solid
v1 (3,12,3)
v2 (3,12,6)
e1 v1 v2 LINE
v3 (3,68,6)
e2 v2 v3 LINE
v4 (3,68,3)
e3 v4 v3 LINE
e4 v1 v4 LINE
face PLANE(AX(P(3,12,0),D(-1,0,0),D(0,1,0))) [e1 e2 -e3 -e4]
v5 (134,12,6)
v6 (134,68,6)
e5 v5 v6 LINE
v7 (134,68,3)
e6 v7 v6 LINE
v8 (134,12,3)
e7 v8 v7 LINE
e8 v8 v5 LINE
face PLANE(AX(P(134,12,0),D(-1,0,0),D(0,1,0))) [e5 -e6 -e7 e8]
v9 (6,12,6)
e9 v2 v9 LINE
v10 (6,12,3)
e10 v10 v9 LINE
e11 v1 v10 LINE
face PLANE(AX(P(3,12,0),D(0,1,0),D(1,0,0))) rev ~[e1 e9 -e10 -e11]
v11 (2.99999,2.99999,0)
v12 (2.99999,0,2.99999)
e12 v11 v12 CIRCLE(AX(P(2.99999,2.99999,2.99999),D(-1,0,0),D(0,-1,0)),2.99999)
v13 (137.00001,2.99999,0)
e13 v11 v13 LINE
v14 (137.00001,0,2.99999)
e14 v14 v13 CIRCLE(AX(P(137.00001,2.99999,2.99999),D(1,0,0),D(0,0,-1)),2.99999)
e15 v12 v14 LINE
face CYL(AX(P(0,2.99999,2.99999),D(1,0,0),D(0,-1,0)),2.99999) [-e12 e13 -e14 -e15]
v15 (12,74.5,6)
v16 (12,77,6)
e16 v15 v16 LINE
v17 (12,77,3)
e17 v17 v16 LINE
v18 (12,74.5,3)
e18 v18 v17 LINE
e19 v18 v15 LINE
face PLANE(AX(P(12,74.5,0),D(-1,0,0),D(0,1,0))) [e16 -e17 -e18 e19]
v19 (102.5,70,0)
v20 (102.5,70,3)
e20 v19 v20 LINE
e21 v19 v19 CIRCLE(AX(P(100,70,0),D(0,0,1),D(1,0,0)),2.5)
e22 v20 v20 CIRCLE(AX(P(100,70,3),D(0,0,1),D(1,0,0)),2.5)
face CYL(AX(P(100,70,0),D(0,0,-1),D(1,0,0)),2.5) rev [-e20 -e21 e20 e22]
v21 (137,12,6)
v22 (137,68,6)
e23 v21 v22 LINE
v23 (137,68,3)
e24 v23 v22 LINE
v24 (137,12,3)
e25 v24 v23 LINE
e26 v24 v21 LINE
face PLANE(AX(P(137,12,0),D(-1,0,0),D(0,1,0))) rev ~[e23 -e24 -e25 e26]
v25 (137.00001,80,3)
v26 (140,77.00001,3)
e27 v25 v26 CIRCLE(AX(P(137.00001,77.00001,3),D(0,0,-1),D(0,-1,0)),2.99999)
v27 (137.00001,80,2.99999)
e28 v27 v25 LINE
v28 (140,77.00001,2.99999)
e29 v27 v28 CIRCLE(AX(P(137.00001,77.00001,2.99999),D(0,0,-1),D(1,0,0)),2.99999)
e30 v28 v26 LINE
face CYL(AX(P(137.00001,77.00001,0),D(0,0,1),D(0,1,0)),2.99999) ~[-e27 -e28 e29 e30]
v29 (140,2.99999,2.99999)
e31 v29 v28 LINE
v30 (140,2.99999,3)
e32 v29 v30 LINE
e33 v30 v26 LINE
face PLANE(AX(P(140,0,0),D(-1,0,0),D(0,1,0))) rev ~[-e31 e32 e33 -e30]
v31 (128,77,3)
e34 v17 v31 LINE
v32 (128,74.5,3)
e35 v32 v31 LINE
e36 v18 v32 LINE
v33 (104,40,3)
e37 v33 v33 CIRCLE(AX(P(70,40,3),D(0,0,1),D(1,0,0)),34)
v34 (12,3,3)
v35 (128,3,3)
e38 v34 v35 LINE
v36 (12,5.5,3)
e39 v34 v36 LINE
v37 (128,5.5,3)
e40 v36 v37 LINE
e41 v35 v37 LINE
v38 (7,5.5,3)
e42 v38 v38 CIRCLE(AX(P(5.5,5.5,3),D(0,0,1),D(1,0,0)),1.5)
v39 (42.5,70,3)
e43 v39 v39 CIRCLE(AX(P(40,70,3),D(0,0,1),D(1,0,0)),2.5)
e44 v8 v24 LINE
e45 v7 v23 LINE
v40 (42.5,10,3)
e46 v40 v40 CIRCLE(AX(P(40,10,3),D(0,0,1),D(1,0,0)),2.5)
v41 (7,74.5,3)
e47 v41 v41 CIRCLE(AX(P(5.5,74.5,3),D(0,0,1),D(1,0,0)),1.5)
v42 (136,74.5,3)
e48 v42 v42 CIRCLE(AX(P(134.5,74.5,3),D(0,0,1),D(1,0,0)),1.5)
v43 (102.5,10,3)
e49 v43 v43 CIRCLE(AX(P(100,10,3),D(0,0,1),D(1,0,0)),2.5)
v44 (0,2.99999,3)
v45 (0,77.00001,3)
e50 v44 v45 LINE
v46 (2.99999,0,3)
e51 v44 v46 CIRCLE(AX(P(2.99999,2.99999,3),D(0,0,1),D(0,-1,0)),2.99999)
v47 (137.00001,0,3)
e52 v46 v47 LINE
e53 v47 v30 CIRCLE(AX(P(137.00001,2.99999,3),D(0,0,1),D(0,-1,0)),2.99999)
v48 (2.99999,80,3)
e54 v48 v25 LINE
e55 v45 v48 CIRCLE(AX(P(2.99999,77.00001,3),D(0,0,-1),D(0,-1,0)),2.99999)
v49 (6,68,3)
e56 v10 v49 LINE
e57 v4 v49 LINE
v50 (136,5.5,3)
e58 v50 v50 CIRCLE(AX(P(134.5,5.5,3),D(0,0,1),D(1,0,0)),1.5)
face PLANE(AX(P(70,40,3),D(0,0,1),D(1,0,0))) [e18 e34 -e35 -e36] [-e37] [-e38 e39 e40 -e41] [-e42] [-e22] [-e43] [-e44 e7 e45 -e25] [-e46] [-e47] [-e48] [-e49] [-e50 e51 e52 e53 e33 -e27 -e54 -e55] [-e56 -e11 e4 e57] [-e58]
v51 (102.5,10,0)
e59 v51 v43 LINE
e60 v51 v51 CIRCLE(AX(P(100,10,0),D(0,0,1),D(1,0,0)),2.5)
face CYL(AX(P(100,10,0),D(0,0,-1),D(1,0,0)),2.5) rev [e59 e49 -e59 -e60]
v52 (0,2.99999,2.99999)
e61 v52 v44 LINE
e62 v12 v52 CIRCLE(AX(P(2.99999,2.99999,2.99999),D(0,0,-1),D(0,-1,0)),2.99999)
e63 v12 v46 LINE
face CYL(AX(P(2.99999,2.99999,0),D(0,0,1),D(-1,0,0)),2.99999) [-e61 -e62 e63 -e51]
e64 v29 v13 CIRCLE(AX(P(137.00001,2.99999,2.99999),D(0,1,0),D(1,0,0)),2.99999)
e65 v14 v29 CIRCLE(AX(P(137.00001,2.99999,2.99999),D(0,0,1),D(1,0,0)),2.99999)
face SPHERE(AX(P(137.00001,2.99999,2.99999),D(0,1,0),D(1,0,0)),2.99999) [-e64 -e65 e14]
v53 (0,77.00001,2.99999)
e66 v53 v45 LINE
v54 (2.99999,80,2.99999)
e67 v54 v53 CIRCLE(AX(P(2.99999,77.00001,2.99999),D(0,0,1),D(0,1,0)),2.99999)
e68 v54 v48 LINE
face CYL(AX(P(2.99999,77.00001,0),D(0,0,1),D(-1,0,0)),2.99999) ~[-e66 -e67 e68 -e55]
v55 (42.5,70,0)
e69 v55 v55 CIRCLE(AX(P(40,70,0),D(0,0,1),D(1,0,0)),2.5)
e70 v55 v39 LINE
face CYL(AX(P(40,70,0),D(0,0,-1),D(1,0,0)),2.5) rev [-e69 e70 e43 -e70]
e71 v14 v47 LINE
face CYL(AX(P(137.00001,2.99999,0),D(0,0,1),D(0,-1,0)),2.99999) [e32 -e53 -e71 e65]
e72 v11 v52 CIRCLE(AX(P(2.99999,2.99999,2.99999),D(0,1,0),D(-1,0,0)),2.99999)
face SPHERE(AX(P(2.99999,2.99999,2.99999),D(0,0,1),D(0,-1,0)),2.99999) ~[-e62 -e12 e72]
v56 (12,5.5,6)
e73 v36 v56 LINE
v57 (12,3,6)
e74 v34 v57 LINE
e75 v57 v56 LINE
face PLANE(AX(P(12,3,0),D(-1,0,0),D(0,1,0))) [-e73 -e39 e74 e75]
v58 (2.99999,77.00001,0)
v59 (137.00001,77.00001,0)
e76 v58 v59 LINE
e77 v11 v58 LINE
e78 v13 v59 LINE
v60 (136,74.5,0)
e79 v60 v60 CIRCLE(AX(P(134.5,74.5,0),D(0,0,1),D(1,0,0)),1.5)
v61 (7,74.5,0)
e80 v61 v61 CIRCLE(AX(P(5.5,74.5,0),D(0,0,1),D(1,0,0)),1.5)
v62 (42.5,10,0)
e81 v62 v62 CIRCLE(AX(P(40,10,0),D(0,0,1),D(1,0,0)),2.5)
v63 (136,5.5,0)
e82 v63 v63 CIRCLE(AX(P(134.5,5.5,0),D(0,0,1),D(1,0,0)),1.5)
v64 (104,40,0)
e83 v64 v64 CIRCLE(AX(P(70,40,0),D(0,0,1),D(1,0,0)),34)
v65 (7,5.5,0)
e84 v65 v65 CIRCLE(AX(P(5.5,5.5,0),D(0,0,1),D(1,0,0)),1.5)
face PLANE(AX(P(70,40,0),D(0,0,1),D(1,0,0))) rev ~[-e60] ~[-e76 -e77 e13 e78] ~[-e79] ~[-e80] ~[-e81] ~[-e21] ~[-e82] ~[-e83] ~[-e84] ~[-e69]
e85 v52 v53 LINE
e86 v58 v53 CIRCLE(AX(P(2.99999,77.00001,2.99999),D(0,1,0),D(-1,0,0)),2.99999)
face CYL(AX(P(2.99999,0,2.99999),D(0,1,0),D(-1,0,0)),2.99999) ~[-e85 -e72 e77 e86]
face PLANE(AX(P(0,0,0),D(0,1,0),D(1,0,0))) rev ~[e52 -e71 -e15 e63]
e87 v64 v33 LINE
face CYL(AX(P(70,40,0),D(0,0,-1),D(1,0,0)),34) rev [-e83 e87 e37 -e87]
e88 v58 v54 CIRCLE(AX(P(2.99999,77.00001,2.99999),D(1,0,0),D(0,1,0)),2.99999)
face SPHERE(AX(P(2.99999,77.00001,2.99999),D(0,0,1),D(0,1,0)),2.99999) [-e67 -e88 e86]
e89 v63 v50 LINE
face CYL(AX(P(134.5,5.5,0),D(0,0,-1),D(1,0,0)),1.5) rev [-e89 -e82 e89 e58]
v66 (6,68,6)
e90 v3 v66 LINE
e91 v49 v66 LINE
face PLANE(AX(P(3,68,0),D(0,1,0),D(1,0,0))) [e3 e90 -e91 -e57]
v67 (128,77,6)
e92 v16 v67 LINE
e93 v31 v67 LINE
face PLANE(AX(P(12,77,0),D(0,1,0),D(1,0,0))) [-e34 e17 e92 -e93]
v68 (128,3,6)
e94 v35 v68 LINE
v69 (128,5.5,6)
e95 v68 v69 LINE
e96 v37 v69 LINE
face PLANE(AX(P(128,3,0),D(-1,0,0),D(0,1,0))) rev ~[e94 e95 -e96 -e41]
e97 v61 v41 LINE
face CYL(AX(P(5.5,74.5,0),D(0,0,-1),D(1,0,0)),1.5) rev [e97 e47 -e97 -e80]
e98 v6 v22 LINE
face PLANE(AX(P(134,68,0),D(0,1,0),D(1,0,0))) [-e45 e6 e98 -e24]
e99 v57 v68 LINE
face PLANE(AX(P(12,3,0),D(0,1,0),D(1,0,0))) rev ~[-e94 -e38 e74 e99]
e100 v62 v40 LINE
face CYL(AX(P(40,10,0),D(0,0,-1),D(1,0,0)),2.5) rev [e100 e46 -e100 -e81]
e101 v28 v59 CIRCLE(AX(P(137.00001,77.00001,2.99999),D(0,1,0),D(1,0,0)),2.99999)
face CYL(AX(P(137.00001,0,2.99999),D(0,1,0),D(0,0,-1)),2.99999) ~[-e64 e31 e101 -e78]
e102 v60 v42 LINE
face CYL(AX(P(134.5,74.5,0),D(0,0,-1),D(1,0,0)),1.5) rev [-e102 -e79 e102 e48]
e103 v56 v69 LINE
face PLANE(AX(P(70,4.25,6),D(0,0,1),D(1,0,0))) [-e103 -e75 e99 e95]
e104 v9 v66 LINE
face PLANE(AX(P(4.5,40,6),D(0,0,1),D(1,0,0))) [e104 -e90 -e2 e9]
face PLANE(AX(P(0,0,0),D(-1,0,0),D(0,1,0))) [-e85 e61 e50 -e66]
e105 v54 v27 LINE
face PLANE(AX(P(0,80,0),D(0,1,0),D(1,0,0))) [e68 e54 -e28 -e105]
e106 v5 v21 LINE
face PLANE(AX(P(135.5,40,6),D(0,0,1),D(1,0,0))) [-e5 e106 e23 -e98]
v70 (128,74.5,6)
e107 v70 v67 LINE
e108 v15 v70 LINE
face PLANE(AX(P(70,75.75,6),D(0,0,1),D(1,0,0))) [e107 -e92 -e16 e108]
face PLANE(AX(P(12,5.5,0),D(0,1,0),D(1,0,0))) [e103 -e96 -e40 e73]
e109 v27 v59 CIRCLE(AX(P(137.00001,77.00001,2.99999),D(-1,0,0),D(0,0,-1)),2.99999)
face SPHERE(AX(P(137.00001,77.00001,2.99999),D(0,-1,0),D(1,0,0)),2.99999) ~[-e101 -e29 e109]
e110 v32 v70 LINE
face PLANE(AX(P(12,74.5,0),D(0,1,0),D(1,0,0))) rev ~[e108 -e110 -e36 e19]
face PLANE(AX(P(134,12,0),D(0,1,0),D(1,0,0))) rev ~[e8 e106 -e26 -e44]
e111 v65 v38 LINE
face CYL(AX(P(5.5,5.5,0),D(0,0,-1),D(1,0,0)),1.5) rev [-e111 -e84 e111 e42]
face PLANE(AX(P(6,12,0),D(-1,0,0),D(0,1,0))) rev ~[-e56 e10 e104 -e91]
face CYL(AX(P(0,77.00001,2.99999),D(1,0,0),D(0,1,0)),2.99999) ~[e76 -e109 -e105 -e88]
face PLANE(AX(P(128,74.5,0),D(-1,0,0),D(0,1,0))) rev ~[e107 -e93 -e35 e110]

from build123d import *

# Parameters (mm, degrees)
F0_W     = 116
F0_H     = 2.5
F1_DEPTH = 6
F0_W_2   = 3
F0_H_2   = 56
F0_W_3   = 140
F0_H_3   = 80
F0_R     = 1.5
F0_R_2   = 2.5
F0_R_3   = 34
F2_DEPTH = 3
F3_R     = 2.99999


# Not quite as in the source:
# - a fillet or chamfer is up to 0.001 mm smaller than in the source, because OpenCascade refuses the exact size


with BuildPart() as f1:
    # F0 (on Top) → F1 (new body)
    with BuildSketch(Plane.XY):
        with Locations((70, 75.75)):
            Rectangle(F0_W, F0_H)
    extrude(amount=F1_DEPTH)



with BuildPart() as f1b:
    # F0 (on Top) → F1, piece 2 (new body)
    with BuildSketch(Plane.XY):
        with Locations((70, 4.25)):
            Rectangle(F0_W, F0_H)
    extrude(amount=F1_DEPTH)


with BuildPart() as f1c:
    # F0 (on Top) → F1, piece 3 (new body)
    with BuildSketch(Plane.XY):
        with Locations((4.5, 40)):
            Rectangle(F0_W_2, F0_H_2)
    extrude(amount=F1_DEPTH)


with BuildPart() as f1d:
    # F0 (on Top) → F1, piece 4 (new body)
    with BuildSketch(Plane.XY):
        with Locations((135.5, 40)):
            Rectangle(F0_W_2, F0_H_2)
    extrude(amount=F1_DEPTH)


with BuildPart() as f1_1:
    add(f1.part)

    add(f1b.part)  # F2 merges F1b

    add(f1c.part)  # F2 merges F1c

    add(f1d.part)  # F2 merges F1d
    # F0 (on Top) → F2 (join)
    with BuildSketch(Plane.XY):
        with Locations((70, 40)):
            Rectangle(F0_W_3, F0_H_3)
        with Locations((5.5, 5.5)):
            Circle(F0_R, mode=Mode.SUBTRACT)
        with Locations((40, 10)):
            Circle(F0_R_2, mode=Mode.SUBTRACT)
        with Locations((70, 4.25)):
            Rectangle(F0_W, F0_H, mode=Mode.SUBTRACT)
        with Locations((100, 10)):
            Circle(F0_R_2, mode=Mode.SUBTRACT)
        with Locations((134.5, 5.5)):
            Circle(F0_R, mode=Mode.SUBTRACT)
        with Locations((4.5, 40)):
            Rectangle(F0_W_2, F0_H_2, mode=Mode.SUBTRACT)
        with Locations((5.5, 74.5)):
            Circle(F0_R, mode=Mode.SUBTRACT)
        with Locations((40, 70)):
            Circle(F0_R_2, mode=Mode.SUBTRACT)
        with Locations((70, 40)):
            Circle(F0_R_3, mode=Mode.SUBTRACT)
        with Locations((135.5, 40)):
            Rectangle(F0_W_2, F0_H_2, mode=Mode.SUBTRACT)
        with Locations((70, 75.75)):
            Rectangle(F0_W, F0_H, mode=Mode.SUBTRACT)
        with Locations((100, 70)):
            Circle(F0_R_2, mode=Mode.SUBTRACT)
        with Locations((134.5, 74.5)):
            Circle(F0_R, mode=Mode.SUBTRACT)
    extrude(amount=F2_DEPTH)

    # F3 (radius 3 in the source; OpenCascade refuses exactly that, so slightly less here)
    f3_edges = [f1_1.edges().sort_by_distance(p)[0] for p in [
        (140, 40, 0),
        (140, 80, 1.5),
        (0, 0, 1.5),
        (0, 80, 1.5),
        (140, 0, 1.5),
        (70, 0, 0),
        (70, 80, 0),
        (0, 40, 0),
    ]]
    fillet(f3_edges, radius=F3_R)


solid = f1_1.part
